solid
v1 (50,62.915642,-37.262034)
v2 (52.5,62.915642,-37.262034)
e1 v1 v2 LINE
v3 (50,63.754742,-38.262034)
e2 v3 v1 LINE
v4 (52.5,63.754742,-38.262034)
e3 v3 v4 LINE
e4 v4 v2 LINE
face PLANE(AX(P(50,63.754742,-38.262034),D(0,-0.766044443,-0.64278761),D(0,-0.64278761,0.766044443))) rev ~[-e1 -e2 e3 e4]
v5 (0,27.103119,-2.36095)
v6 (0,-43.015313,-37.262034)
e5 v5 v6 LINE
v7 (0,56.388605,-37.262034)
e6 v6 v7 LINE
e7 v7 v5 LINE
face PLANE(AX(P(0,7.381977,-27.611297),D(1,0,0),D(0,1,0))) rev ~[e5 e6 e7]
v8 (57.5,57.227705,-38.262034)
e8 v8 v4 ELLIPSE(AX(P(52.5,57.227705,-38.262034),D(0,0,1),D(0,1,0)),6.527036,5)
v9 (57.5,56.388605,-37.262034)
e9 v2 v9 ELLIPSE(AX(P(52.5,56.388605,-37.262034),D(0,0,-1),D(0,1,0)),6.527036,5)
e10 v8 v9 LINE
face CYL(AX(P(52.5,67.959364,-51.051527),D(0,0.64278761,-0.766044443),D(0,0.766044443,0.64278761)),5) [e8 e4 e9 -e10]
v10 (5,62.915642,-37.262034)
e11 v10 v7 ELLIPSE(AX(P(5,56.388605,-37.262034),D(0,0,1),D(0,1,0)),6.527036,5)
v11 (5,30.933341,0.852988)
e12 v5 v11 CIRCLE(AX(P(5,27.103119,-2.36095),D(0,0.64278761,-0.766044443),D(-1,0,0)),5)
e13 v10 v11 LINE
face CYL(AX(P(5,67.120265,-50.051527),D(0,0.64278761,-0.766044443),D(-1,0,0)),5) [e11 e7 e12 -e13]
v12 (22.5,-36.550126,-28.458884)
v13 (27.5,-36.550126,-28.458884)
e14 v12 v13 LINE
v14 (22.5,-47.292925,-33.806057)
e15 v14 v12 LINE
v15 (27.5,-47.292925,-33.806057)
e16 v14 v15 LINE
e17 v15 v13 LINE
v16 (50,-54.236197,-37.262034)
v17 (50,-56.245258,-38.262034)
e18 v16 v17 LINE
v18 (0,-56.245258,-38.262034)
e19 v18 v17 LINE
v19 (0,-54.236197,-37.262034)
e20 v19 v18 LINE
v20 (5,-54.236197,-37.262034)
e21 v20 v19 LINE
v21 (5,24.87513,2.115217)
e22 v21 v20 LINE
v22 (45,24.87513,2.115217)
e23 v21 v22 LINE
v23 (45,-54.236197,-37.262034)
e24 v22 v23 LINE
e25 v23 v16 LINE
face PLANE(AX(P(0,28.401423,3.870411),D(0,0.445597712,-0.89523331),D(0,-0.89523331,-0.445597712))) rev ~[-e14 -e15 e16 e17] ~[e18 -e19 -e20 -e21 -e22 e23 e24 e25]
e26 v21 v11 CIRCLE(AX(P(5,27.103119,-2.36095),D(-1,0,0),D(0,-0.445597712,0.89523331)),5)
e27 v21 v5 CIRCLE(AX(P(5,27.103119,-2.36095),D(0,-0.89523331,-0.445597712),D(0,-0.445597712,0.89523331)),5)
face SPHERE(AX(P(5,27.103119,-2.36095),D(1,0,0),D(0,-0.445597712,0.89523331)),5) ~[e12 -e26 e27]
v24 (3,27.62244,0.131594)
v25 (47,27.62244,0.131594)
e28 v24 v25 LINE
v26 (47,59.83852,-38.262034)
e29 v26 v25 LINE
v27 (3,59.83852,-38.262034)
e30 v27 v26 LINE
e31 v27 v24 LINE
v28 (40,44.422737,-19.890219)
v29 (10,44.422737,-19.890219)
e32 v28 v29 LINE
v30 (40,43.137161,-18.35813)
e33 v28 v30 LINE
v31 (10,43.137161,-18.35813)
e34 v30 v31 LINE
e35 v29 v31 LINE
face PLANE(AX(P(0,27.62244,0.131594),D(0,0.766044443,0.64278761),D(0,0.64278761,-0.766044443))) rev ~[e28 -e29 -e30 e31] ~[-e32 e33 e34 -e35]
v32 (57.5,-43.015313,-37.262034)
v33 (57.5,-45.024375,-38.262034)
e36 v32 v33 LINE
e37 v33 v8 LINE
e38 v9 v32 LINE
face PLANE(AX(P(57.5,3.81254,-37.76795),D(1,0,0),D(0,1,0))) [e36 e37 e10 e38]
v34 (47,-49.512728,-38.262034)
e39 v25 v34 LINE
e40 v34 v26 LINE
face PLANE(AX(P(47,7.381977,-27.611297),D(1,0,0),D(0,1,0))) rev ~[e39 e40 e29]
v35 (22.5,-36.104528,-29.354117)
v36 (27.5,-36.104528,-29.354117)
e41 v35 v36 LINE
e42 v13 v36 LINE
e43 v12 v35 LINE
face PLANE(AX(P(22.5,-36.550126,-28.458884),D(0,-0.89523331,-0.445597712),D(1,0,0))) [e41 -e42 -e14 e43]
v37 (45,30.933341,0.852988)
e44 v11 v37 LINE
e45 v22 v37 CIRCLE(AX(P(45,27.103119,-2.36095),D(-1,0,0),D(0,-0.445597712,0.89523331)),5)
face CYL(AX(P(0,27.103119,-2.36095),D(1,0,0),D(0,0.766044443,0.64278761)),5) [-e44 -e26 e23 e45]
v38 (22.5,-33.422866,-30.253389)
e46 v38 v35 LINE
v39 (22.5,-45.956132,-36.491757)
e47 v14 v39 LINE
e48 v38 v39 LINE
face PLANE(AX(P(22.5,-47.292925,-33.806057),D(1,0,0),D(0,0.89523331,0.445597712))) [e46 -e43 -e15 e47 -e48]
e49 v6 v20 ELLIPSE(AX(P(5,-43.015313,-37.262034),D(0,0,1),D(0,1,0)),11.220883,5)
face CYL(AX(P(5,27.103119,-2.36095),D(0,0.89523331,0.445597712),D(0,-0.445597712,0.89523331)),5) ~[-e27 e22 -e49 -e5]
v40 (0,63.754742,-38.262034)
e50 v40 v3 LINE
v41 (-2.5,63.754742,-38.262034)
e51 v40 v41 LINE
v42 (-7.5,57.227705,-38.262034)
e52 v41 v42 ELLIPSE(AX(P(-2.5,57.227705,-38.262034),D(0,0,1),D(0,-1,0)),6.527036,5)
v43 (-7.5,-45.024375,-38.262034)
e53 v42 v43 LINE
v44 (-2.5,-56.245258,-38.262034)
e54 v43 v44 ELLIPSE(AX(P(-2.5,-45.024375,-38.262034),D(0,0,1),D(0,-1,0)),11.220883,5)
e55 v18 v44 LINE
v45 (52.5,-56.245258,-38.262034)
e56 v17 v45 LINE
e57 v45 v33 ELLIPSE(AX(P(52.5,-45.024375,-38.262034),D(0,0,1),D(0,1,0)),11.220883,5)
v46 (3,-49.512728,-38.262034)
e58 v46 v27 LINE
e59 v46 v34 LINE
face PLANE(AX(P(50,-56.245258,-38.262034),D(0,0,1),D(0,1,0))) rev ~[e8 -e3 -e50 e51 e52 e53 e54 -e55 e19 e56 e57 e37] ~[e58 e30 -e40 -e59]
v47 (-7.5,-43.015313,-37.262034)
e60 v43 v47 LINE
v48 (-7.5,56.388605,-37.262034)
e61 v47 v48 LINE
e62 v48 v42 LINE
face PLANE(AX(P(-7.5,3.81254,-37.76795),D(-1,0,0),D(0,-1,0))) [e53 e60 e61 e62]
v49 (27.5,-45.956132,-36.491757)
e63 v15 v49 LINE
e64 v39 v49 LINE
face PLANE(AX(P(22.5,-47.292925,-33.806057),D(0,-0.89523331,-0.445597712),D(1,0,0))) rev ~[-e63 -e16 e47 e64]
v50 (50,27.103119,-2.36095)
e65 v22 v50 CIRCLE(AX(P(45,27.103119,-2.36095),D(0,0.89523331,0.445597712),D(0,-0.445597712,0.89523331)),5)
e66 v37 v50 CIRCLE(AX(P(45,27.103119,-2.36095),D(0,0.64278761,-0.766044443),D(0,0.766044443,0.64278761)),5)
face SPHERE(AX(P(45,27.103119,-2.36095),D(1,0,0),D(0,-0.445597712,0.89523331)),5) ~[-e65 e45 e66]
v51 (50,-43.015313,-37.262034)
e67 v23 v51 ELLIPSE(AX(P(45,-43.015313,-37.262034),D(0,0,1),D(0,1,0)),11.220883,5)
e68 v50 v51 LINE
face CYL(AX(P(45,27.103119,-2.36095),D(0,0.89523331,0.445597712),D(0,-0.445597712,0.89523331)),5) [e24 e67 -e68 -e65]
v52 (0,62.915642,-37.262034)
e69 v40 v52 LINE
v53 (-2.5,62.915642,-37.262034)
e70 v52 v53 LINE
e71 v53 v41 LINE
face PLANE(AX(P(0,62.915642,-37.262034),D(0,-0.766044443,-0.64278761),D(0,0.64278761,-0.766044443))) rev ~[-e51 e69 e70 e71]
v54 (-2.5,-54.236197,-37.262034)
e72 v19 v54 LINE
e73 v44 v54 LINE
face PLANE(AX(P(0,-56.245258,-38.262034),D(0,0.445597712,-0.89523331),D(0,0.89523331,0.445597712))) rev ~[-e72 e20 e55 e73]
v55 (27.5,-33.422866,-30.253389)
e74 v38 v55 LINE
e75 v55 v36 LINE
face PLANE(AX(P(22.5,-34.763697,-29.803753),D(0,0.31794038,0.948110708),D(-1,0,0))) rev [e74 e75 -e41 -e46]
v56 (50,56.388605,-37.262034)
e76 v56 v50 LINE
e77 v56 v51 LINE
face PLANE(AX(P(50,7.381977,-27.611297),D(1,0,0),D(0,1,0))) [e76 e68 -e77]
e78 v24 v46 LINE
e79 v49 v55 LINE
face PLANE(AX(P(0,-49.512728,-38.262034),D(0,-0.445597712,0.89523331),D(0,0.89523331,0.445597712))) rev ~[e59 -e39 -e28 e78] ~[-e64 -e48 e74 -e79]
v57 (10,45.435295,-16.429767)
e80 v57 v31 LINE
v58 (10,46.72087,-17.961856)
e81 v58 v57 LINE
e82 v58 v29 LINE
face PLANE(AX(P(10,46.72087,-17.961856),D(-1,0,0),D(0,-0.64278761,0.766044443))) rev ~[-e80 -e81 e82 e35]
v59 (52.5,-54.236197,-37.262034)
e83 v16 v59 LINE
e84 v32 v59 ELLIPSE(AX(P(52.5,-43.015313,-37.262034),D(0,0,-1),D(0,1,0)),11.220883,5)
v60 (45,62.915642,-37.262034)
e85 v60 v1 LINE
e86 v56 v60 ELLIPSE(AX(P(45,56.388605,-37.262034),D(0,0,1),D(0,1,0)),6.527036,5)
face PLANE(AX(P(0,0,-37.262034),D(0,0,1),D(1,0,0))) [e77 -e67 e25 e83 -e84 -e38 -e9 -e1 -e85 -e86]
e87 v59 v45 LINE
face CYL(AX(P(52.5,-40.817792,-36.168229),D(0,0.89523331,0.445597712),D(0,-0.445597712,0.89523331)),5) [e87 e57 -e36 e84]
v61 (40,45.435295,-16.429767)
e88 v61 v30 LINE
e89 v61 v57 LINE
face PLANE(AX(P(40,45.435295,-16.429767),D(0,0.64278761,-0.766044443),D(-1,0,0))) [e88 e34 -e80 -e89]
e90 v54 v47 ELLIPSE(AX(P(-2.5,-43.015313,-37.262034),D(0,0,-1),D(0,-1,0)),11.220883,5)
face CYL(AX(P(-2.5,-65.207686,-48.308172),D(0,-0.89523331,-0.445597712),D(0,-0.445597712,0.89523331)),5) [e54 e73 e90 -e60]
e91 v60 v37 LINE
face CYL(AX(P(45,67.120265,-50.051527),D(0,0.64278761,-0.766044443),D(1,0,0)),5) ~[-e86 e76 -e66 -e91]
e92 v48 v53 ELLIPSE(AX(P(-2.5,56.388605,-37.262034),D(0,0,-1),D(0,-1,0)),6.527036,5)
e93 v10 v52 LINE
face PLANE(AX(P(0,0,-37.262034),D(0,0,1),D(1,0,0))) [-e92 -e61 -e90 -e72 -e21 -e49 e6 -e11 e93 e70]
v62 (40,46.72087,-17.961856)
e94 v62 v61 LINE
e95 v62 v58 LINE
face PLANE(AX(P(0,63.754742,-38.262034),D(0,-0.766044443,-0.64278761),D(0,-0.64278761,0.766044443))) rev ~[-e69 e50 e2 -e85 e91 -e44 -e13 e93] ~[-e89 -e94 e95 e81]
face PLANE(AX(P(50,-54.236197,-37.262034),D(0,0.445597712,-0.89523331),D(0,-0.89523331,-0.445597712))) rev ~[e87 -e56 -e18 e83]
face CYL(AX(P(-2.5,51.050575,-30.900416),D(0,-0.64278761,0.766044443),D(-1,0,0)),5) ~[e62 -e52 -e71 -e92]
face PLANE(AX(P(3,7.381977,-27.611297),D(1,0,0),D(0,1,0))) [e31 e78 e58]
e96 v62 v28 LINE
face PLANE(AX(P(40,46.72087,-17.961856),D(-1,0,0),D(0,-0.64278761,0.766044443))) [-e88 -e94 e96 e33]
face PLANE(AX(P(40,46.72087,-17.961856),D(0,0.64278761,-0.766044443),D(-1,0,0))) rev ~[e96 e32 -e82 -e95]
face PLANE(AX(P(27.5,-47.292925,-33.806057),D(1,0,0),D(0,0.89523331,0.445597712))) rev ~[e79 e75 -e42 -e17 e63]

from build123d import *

# Parameters (mm, degrees)
F1_DEPTH      = 50
F2_DEPTH      = 3
F4_DEPTH      = 3
F5_W          = 30
F5_H          = 2
F6_DEPTH      = 25
F7_W          = 5
F7_H          = 12
F8_DEPTH      = 25
F9_SIZE       = 2
F11_DEPTH     = 7.5
F12_T1_DEPTH  = 26.3054072893
F13_T1_DEPTH  = 27.2441766919
F15_DEPTH     = 7.5
F16_T1_DEPTH  = 26.3054072893
F17_T1_DEPTH  = 27.2441766919
F18_R         = 5
F19_T4_DEPTH  = 100.8695078042
F19_T7_ANGLE  = 76.4615865705
F19_T11_DEPTH = 62.2556275763
F20_T4_DEPTH  = 100.8695078042
F20_T9_DEPTH  = 62.2556275763
F20_T12_ANGLE = 76.4615865705


# Not quite as in the source:
# - a fillet or chamfer that OpenCascade refuses, or shapes differently, is made with other operations: its cross-section is extruded or revolved along the edge and cut away or added


with BuildPart() as f1:
    # F0 (on Right) → F1 (new body)
    with BuildSketch(Plane.YZ):
        Polygon((28.4014230277, 3.870410641), (-56.2452584396, -38.2620337305), (-49.5127283639, -38.2620337305), (27.6224404883, 0.1315944002), (59.8385196924, -38.2620337305), (63.7547415604, -38.2620337305), align=None)
    extrude(amount=F1_DEPTH)

    # F0 (on Right) → F2 (join)
    with BuildSketch(Plane.YZ):
        Polygon((27.6224404883, 0.1315944002), (-49.5127283639, -38.2620337305), (59.8385196924, -38.2620337305), align=None)
    extrude(amount=F2_DEPTH)

    # F3 (on face) → F4 (join)
    with BuildSketch(Plane.YZ.offset(50)):
        Polygon((27.6224404883, 0.1315944002), (-49.5127283639, -38.2620337305), (59.8385196924, -38.2620337305), align=None)
    extrude(amount=-F4_DEPTH)

    # F5 (on face) → F6 (cut)
    with BuildSketch(Plane(origin=(0, 18.5724443931, 15.5841312403), x_dir=(-1, 0, 0), z_dir=(0, 0.7660444431, 0.6427876097))):
        with Locations((-25, -42.7911762555)):
            Rectangle(F5_W, F5_H)
    extrude(amount=-F6_DEPTH, mode=Mode.SUBTRACT)

    # F7 (on face) → F8 (cut)
    with BuildSketch(Plane(origin=(0, 4.0953498153, -8.2278105741), x_dir=(1, 0, 0), z_dir=(0, -0.4455977123, 0.8952333097))):
        with Locations((25, -51.4021035664)):
            Rectangle(F7_W, F7_H)
    extrude(amount=-F8_DEPTH, mode=Mode.SUBTRACT)

    # F9
    f9_edges = [f1.edges().sort_by_distance(p)[0] for p in [
        (25, -35.213332, -31.144584),
    ]]
    chamfer(f9_edges, length=F9_SIZE)

    # F10 (on face) → F11 (join)
    with BuildSketch(Plane(origin=(0, 0, 0), x_dir=(0, -1, 0), z_dir=(-1, 0, 0))):
        Polygon((56.2452584396, -38.2620337305), (54.2361967122, -37.2620337305), (-62.9156419292, -37.2620337305), (-63.7547415604, -38.2620337305), align=None)
    extrude(amount=F11_DEPTH)

    # F12: fillet of radius 5 on 1 edges, made by hand

    # F12_s2 → F12_t1 (cut)
    with BuildSketch(Plane(origin=(0, 36.3083524151, -43.2706094318), x_dir=(1, 0, 0), z_dir=(0, 0.6427876097, -0.7660444431))):
        with BuildLine():
            ThreePointArc((-7.5, -19.2446042914), (-6.0355339059, -22.7801381974), (-2.5, -24.2446042914))
            Line((-2.5, -24.2446042914), (-7.5, -24.2446042914))
            Line((-7.5, -24.2446042914), (-7.5, -19.2446042914))
        make_face()
    extrude(amount=F12_T1_DEPTH, mode=Mode.SUBTRACT)

    # F13: fillet of radius 5 on 1 edges, made by hand

    # F13_s2 → F13_t1 (cut)
    with BuildSketch(Plane(origin=(0, -71.5310246258, -35.6041945608), x_dir=(1, 0, 0), z_dir=(0, 0.8952333097, 0.4455977123))):
        with BuildLine():
            ThreePointArc((-2.5, 9.1906886005), (-6.0355339059, 10.6551546946), (-7.5, 14.1906886005))
            Line((-7.5, 14.1906886005), (-7.5, 9.1906886005))
            Line((-7.5, 9.1906886005), (-2.5, 9.1906886005))
        make_face()
    extrude(amount=F13_T1_DEPTH, mode=Mode.SUBTRACT)

    # F14 (on face) → F15 (join)
    with BuildSketch(Plane.YZ.offset(50)):
        Polygon((63.7547415604, -38.2620337305), (62.9156419292, -37.2620337305), (-54.2361967122, -37.2620337305), (-56.2452584396, -38.2620337305), align=None)
    extrude(amount=F15_DEPTH)

    # F16: fillet of radius 5 on 1 edges, made by hand

    # F16_s2 → F16_t1 (cut)
    with BuildSketch(Plane(origin=(0, 53.2171422884, -63.4217205098), x_dir=(1, 0, 0), z_dir=(0, -0.6427876097, 0.7660444431))):
        with BuildLine():
            ThreePointArc((52.5, 24.2446042914), (56.0355339059, 22.7801381974), (57.5, 19.2446042914))
            Line((57.5, 19.2446042914), (57.5, 24.2446042914))
            Line((57.5, 24.2446042914), (52.5, 24.2446042914))
        make_face()
    extrude(amount=F16_T1_DEPTH, mode=Mode.SUBTRACT)

    # F17: fillet of radius 5 on 1 edges, made by hand

    # F17_s2 → F17_t1 (cut)
    with BuildSketch(Plane(origin=(0, -47.1411301566, -23.4642517522), x_dir=(1, 0, 0), z_dir=(0, -0.8952333097, -0.4455977123))):
        with BuildLine():
            ThreePointArc((52.5, -9.1906886005), (56.0355339059, -10.6551546946), (57.5, -14.1906886005))
            Line((57.5, -14.1906886005), (57.5, -9.1906886005))
            Line((57.5, -9.1906886005), (52.5, -9.1906886005))
        make_face()
    extrude(amount=F17_T1_DEPTH, mode=Mode.SUBTRACT)

    # F18
    f18_edges = [f1.edges().sort_by_distance(p)[0] for p in [
        (25, 28.401423, 3.870411),
    ]]
    fillet(f18_edges, radius=F18_R)

    # F19: fillet of radius 5 on 3 edges, made by hand


with BuildPart() as f19_tool2:
    # F19_s3 → F19_t4 (new body)
    with BuildSketch(Plane(origin=(0, 20.7797804184, 10.3430273622), x_dir=(1, 0, 0), z_dir=(0, -0.8952333097, -0.4455977123))):
        with BuildLine():
            ThreePointArc((45, -9.1906886005), (48.5355339059, -10.6551546946), (50, -14.1906886005))
            Line((50, -14.1906886005), (50, -9.1906886005))
            Line((50, -9.1906886005), (45, -9.1906886005))
        make_face()
    extrude(amount=F19_T4_DEPTH)

    split(bisect_by=Plane.XY.offset(-37.2620337305), keep=Keep.TOP)


with BuildPart() as f1_1:
    add(f1.part)

    # F19_t1: cut F19_tool2
    add(f19_tool2.part, mode=Mode.SUBTRACT)

    # F19_s6 → F19_t7 (revolve, cut)
    with BuildSketch(Plane(origin=(0, 20.7797804184, 10.3430273622), x_dir=(1, 0, 0), z_dir=(0, -0.8952333097, -0.4455977123))):
        with BuildLine():
            ThreePointArc((45, -9.1906886005), (48.5355339059, -10.6551546946), (50, -14.1906886005))
            Line((50, -14.1906886005), (50, -9.1906886005))
            Line((50, -9.1906886005), (45, -9.1906886005))
        make_face()
    revolve(axis=Axis((50, 27.1031187954, -2.3609497603), (-1, 0, 0)), revolution_arc=F19_T7_ANGLE, mode=Mode.SUBTRACT)


with BuildPart() as f19_tool9:
    # F19_s10 → F19_t11 (new body)
    with BuildSketch(Plane(origin=(0, 52.3780426572, -62.4217205098), x_dir=(1, 0, 0), z_dir=(0, -0.6427876097, 0.7660444431))):
        with BuildLine():
            ThreePointArc((50, 19.2446042914), (48.5355339059, 22.7801381974), (45, 24.2446042914))
            Line((45, 24.2446042914), (50, 24.2446042914))
            Line((50, 24.2446042914), (50, 19.2446042914))
        make_face()
    extrude(amount=F19_T11_DEPTH)

    split(bisect_by=Plane.XY.offset(-37.2620337305), keep=Keep.TOP)


with BuildPart() as f1_2:
    add(f1_1.part)

    # F19_t8: cut F19_tool9
    add(f19_tool9.part, mode=Mode.SUBTRACT)

    # F20: fillet of radius 5 on 3 edges, made by hand


with BuildPart() as f20_tool2:
    # F20_s3 → F20_t4 (new body)
    with BuildSketch(Plane(origin=(0, 20.7797804184, 10.3430273622), x_dir=(1, 0, 0), z_dir=(0, -0.8952333097, -0.4455977123))):
        with BuildLine():
            ThreePointArc((5, -9.1906886005), (1.4644660941, -10.6551546946), (0, -14.1906886005))
            Line((0, -14.1906886005), (0, -9.1906886005))
            Line((0, -9.1906886005), (5, -9.1906886005))
        make_face()
    extrude(amount=F20_T4_DEPTH)

    split(bisect_by=Plane.XY.offset(-37.2620337305), keep=Keep.TOP)


with BuildPart() as f1_3:
    add(f1_2.part)

    # F20_t1: cut F20_tool2
    add(f20_tool2.part, mode=Mode.SUBTRACT)


with BuildPart() as f20_tool7:
    # F20_s8 → F20_t9 (new body)
    with BuildSketch(Plane(origin=(0, 52.3780426572, -62.4217205098), x_dir=(1, 0, 0), z_dir=(0, -0.6427876097, 0.7660444431))):
        with BuildLine():
            ThreePointArc((0, 19.2446042914), (1.4644660941, 22.7801381974), (5, 24.2446042914))
            Line((5, 24.2446042914), (0, 24.2446042914))
            Line((0, 24.2446042914), (0, 19.2446042914))
        make_face()
    extrude(amount=F20_T9_DEPTH)

    split(bisect_by=Plane.XY.offset(-37.2620337305), keep=Keep.TOP)


with BuildPart() as f1_4:
    add(f1_3.part)

    # F20_t6: cut F20_tool7
    add(f20_tool7.part, mode=Mode.SUBTRACT)

    # F20_s11 → F20_t12 (revolve, cut)
    with BuildSketch(Plane(origin=(0, 20.7797804184, 10.3430273622), x_dir=(1, 0, 0), z_dir=(0, -0.8952333097, -0.4455977123))):
        with BuildLine():
            ThreePointArc((0, -14.1906886005), (1.4644660941, -10.6551546946), (5, -9.1906886005))
            Line((5, -9.1906886005), (0, -9.1906886005))
            Line((0, -9.1906886005), (0, -14.1906886005))
        make_face()
    revolve(axis=Axis((0, 27.1031187954, -2.3609497603), (-1, 0, 0)), revolution_arc=F20_T12_ANGLE, mode=Mode.SUBTRACT)


solid = f1_4.part
